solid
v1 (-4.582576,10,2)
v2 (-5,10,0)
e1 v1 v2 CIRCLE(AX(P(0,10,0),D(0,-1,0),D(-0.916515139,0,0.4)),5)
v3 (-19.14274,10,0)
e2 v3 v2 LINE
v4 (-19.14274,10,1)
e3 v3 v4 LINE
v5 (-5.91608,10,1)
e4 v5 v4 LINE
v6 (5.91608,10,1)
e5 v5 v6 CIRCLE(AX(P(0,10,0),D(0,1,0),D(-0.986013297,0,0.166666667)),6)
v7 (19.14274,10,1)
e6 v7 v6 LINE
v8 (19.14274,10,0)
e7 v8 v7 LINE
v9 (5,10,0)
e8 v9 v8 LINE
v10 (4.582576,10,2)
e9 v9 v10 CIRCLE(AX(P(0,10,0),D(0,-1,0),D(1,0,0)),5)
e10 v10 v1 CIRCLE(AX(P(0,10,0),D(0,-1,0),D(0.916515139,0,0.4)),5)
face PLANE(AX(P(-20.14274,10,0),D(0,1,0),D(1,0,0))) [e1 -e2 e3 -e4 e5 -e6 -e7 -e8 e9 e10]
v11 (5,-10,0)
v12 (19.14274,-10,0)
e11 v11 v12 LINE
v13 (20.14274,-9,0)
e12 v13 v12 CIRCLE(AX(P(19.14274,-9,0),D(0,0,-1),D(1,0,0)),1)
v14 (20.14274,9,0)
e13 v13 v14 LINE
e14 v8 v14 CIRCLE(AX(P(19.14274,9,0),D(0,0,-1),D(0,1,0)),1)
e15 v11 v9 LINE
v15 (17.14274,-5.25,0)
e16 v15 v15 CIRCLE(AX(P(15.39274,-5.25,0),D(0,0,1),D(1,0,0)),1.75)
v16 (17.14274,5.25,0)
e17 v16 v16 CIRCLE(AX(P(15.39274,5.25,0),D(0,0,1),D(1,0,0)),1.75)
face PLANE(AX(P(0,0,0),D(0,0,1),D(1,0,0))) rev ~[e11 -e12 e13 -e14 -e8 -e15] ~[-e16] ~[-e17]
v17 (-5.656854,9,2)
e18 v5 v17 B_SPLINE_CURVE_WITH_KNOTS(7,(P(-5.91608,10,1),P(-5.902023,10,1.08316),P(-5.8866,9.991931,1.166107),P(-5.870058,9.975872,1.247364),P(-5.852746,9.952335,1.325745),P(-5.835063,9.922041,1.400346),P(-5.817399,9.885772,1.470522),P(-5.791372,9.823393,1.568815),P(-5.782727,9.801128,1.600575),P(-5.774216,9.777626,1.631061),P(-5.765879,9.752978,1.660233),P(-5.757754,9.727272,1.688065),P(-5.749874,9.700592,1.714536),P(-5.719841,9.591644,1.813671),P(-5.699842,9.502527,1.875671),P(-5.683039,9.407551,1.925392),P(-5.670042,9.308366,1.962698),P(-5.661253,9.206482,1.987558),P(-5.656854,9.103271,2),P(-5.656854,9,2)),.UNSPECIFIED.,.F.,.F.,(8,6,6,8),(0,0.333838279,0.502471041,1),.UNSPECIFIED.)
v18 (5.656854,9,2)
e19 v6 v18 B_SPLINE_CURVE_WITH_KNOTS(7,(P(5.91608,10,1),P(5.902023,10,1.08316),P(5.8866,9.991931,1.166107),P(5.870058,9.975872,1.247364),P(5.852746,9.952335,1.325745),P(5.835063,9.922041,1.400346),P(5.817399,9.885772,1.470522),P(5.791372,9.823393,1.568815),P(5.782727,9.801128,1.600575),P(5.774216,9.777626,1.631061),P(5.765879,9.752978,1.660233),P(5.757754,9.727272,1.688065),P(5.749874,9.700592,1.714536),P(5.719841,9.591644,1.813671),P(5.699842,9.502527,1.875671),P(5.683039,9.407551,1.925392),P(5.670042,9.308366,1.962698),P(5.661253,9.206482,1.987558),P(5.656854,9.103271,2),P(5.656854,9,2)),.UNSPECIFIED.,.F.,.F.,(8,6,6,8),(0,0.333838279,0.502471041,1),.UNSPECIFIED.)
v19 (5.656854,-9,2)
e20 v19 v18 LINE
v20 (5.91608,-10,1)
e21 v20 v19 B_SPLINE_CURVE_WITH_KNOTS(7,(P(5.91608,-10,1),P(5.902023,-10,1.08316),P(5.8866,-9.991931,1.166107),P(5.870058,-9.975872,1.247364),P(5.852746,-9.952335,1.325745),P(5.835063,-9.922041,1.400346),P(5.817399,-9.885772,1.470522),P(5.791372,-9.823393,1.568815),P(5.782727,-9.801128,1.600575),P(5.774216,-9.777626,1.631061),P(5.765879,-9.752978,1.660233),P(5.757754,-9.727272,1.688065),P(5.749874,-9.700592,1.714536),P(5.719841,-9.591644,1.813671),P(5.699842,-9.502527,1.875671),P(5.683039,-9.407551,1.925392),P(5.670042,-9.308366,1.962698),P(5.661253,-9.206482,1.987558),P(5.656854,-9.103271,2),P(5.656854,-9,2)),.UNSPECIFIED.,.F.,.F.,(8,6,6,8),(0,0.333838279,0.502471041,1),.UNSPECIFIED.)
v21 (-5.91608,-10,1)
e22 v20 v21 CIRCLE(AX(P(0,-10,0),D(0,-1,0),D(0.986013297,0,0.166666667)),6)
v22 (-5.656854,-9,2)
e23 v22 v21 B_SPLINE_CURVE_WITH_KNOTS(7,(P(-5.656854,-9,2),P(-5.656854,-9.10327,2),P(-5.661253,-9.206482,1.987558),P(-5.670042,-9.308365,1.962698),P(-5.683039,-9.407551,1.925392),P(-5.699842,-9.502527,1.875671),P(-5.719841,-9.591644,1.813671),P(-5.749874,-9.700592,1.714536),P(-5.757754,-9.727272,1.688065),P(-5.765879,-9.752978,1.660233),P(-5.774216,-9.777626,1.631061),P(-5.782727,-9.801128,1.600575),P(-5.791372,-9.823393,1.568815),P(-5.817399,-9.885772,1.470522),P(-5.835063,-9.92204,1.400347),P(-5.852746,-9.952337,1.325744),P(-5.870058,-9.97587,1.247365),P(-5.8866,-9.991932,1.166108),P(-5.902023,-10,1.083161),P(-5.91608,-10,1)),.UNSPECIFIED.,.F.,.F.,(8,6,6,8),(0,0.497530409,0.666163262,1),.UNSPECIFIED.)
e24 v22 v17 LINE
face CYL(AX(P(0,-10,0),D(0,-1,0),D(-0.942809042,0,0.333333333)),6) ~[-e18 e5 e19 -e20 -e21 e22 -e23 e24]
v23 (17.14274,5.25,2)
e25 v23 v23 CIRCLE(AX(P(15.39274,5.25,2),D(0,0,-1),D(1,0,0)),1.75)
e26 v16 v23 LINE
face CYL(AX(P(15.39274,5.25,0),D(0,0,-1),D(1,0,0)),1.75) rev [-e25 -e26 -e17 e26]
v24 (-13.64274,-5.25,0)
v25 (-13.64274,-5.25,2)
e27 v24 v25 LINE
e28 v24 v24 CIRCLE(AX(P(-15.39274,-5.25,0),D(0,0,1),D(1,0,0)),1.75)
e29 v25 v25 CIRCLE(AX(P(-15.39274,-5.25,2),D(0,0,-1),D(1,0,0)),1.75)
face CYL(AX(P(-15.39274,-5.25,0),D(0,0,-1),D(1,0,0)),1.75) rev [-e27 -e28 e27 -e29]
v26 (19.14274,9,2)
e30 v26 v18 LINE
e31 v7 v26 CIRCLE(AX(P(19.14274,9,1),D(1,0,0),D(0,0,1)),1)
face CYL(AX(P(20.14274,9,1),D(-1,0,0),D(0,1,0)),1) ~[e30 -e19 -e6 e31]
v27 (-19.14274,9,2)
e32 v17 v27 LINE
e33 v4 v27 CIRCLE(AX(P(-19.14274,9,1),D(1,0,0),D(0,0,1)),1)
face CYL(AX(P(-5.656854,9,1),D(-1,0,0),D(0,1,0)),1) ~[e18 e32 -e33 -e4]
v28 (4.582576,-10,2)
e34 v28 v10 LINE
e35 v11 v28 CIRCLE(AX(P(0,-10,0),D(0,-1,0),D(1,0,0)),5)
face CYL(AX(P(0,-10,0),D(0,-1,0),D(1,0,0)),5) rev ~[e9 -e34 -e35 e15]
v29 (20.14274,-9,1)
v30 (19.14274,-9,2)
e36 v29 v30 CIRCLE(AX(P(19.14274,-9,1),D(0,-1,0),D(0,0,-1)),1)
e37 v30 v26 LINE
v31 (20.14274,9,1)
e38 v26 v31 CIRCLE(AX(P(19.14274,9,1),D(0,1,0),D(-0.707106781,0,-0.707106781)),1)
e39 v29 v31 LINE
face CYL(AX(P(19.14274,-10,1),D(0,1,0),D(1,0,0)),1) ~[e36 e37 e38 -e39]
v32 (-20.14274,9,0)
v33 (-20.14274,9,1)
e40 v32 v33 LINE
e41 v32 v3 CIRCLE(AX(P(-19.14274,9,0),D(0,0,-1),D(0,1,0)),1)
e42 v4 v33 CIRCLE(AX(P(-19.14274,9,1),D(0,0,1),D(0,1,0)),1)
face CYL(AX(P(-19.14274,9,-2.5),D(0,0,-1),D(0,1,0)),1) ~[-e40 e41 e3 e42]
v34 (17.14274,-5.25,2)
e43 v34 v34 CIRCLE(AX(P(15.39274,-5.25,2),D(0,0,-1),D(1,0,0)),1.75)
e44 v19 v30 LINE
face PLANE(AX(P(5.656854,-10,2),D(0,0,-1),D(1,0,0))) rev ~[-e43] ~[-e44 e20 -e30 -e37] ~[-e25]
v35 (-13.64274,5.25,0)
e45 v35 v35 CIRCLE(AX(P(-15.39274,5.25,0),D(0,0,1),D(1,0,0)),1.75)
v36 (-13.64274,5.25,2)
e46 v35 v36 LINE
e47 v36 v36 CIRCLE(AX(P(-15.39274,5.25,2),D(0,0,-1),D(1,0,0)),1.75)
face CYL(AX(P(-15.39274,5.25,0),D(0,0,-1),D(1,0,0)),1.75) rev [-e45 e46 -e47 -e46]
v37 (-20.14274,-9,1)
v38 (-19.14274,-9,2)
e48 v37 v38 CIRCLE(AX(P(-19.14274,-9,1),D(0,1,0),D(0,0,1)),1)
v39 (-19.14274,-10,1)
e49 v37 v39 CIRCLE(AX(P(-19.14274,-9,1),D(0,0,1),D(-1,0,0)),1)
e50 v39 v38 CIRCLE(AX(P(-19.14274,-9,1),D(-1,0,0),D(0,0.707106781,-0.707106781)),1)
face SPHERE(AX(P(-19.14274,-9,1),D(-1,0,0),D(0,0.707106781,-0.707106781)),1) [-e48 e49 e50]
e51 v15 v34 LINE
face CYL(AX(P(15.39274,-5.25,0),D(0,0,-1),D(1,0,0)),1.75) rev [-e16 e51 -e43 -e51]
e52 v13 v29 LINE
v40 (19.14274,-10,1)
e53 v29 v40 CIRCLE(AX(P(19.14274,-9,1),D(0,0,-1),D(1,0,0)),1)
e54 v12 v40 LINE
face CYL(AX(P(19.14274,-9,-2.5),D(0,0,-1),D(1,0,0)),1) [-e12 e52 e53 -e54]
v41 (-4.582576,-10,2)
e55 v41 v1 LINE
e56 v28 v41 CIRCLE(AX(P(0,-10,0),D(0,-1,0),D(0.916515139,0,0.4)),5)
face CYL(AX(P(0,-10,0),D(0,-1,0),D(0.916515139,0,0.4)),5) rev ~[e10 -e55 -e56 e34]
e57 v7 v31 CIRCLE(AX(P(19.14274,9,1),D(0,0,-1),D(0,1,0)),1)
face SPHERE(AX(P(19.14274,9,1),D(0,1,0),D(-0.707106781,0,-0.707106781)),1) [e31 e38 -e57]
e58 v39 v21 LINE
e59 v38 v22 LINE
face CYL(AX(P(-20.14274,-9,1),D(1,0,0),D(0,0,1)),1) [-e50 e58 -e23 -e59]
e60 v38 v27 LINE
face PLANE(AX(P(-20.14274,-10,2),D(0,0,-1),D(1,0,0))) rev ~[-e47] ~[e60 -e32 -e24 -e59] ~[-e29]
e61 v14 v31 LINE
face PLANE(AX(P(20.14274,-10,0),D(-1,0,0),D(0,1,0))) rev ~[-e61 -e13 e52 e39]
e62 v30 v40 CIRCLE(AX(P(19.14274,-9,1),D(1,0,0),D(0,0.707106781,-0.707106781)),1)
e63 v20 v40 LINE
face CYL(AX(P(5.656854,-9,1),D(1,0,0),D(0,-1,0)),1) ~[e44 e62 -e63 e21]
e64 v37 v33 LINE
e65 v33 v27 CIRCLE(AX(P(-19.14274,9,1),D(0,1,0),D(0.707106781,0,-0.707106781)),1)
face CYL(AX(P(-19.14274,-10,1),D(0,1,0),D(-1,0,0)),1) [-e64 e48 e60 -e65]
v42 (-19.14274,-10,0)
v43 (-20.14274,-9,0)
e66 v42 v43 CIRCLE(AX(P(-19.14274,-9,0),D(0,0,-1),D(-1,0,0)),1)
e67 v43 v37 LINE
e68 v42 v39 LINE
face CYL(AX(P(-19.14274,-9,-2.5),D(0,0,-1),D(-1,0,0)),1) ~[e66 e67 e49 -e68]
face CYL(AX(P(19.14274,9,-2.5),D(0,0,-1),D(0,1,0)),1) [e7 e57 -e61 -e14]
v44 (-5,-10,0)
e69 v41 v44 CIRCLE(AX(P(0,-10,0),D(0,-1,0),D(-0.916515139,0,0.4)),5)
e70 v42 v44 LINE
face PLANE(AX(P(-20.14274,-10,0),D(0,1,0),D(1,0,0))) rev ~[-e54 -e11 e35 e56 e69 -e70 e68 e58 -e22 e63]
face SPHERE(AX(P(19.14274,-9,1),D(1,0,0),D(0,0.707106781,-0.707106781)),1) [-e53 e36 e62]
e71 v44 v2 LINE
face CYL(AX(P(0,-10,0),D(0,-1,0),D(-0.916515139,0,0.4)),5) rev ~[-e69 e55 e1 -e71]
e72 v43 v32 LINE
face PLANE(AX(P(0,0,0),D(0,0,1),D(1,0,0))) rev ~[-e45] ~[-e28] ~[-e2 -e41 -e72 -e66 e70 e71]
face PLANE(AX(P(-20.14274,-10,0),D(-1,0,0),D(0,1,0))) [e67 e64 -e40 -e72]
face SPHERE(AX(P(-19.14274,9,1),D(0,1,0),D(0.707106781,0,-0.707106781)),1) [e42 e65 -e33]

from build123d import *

# Parameters (mm, degrees)
F0_W         = 40.28548
F0_H         = 20
F0_R         = 1.75
F1_DEPTH     = 10
F3_DEPTH     = 25
F4_R         = 1
F5_T1_DEPTH  = 3.5
F5_S5_W      = 1
F5_S5_H      = 1
F5_T6_DEPTH  = 1
F5_S11_W     = 1
F5_S11_H     = 1
F5_T12_DEPTH = 1
F5_S17_W     = 1
F5_S17_H     = 1
F5_T18_DEPTH = 1
F5_S23_W     = 1
F5_S23_H     = 1
F5_T24_DEPTH = 1


# Not quite as in the source:
# - a fillet or chamfer that OpenCascade refuses, or shapes differently, is made with other operations: its cross-section is extruded or revolved along the edge and cut away or added


with BuildPart() as f1:
    # F0 (on Top) → F1 (new body)
    with BuildSketch(Plane.XY):
        Rectangle(F0_W, F0_H)
        with Locations((-15.39274, -5.25)):
            Circle(F0_R, mode=Mode.SUBTRACT)
        with Locations((15.39274, -5.25)):
            Circle(F0_R, mode=Mode.SUBTRACT)
        with Locations((-15.39274, 5.25)):
            Circle(F0_R, mode=Mode.SUBTRACT)
        with Locations((15.39274, 5.25)):
            Circle(F0_R, mode=Mode.SUBTRACT)
    extrude(amount=F1_DEPTH)

    # F2 (on face) → F3 (cut)
    with BuildSketch(Plane.XZ.offset(10)):
        with BuildLine():
            Line((-4.582575695, 2), (4.582575695, 2))
            ThreePointArc((4.582575695, 2), (0, 5), (-4.582575695, 2))
        make_face()
        with BuildLine():
            Line((-5, 0), (5, 0))
            ThreePointArc((5, 0), (4.8945315647, 1.0215482184), (4.582575695, 2))
            Line((4.582575695, 2), (-4.582575695, 2))
            ThreePointArc((-4.582575695, 2), (-4.8945315647, 1.0215482184), (-5, 0))
        make_face()
        with BuildLine():
            ThreePointArc((-5.6568542495, 2), (0, 6), (5.6568542495, 2))
            Line((5.6568542495, 2), (20.14274, 2))
            Line((20.14274, 2), (20.14274, 10))
            Line((20.14274, 10), (-20.14274, 10))
            Line((-20.14274, 10), (-20.14274, 2))
            Line((-20.14274, 2), (-5.6568542495, 2))
        make_face()
    extrude(amount=-F3_DEPTH, mode=Mode.SUBTRACT)

    # F4
    f4_edges = [f1.edges().sort_by_distance(p)[0] for p in [
        (-20.14274, 0, 2),
        (-12.899797, -10, 2),
        (-12.899797, 10, 2),
        (12.899797, 10, 2),
        (20.14274, 0, 2),
        (12.899797, -10, 2),
    ]]
    fillet(f4_edges, radius=F4_R)

    # F5: fillet of radius 1 on 4 edges, made by hand

    # F5_s2 → F5_t1 (cut)
    with BuildSketch(Plane.XY.offset(-2.5)):
        with BuildLine():
            ThreePointArc((20.14274, -9), (19.8498467812, -9.7071067812), (19.14274, -10))
            Line((19.14274, -10), (20.14274, -10))
            Line((20.14274, -10), (20.14274, -9))
        make_face()
        with BuildLine():
            ThreePointArc((19.14274, 10), (19.8498467812, 9.7071067812), (20.14274, 9))
            Line((20.14274, 9), (20.14274, 10))
            Line((20.14274, 10), (19.14274, 10))
        make_face()
        with BuildLine():
            ThreePointArc((-19.14274, 10), (-19.8498467812, 9.7071067812), (-20.14274, 9))
            Line((-20.14274, 9), (-20.14274, 10))
            Line((-20.14274, 10), (-19.14274, 10))
        make_face()
        with BuildLine():
            ThreePointArc((-20.14274, -9), (-19.8498467812, -9.7071067812), (-19.14274, -10))
            Line((-19.14274, -10), (-20.14274, -10))
            Line((-20.14274, -10), (-20.14274, -9))
        make_face()
    extrude(amount=F5_T1_DEPTH, mode=Mode.SUBTRACT)


with BuildPart() as f5_tool4:
    # F5_s5 → F5_t6 (new body)
    with BuildSketch(Plane.YZ.offset(-19.14274)):
        with Locations((-9.5, 1.5)):
            Rectangle(F5_S5_W, F5_S5_H)
    extrude(amount=-F5_T6_DEPTH)

    # F5_s7 → F5_t8 (revolve, cut)
    with BuildSketch(Plane(origin=(-19.14274, -9, 1), x_dir=(0, 0.7071067812, -0.7071067812), z_dir=(0, 0.7071067812, 0.7071067812))):
        with BuildLine():
            ThreePointArc((0, -1), (1, 0), (0, 1))
            Line((0, 1), (0, -1))
        make_face()
    revolve(axis=Axis((-19.14274, -9, 1), (-1, 0, 0)), mode=Mode.SUBTRACT)


with BuildPart() as f1_1:
    add(f1.part)

    # F5_t3: cut F5_tool4
    add(f5_tool4.part, mode=Mode.SUBTRACT)


with BuildPart() as f5_tool10:
    # F5_s11 → F5_t12 (new body)
    with BuildSketch(Plane.XZ.offset(-9)):
        with Locations((-19.64274, 1.5)):
            Rectangle(F5_S11_W, F5_S11_H)
    extrude(amount=-F5_T12_DEPTH)

    # F5_s13 → F5_t14 (revolve, cut)
    with BuildSketch(Plane(origin=(-19.14274, 9, 1), x_dir=(0.7071067812, 0, -0.7071067812), z_dir=(0.7071067812, 0, 0.7071067812))):
        with BuildLine():
            ThreePointArc((0, -1), (1, 0), (0, 1))
            Line((0, 1), (0, -1))
        make_face()
    revolve(axis=Axis((-19.14274, 9, 1), (0, 1, 0)), mode=Mode.SUBTRACT)


with BuildPart() as f1_2:
    add(f1_1.part)

    # F5_t9: cut F5_tool10
    add(f5_tool10.part, mode=Mode.SUBTRACT)


with BuildPart() as f5_tool16:
    # F5_s17 → F5_t18 (new body)
    with BuildSketch(Plane.XZ.offset(-9)):
        with Locations((19.64274, 1.5)):
            Rectangle(F5_S17_W, F5_S17_H)
    extrude(amount=-F5_T18_DEPTH)

    # F5_s19 → F5_t20 (revolve, cut)
    with BuildSketch(Plane(origin=(19.14274, 9, 1), x_dir=(-0.7071067812, 0, -0.7071067812), z_dir=(0.7071067812, 0, -0.7071067812))):
        with BuildLine():
            ThreePointArc((0, -1), (1, 0), (0, 1))
            Line((0, 1), (0, -1))
        make_face()
    revolve(axis=Axis((19.14274, 9, 1), (0, 1, 0)), mode=Mode.SUBTRACT)


with BuildPart() as f1_3:
    add(f1_2.part)

    # F5_t15: cut F5_tool16
    add(f5_tool16.part, mode=Mode.SUBTRACT)


with BuildPart() as f5_tool22:
    # F5_s23 → F5_t24 (new body)
    with BuildSketch(Plane.YZ.offset(19.14274)):
        with Locations((-9.5, 1.5)):
            Rectangle(F5_S23_W, F5_S23_H)
    extrude(amount=F5_T24_DEPTH)

    # F5_s25 → F5_t26 (revolve, cut)
    with BuildSketch(Plane(origin=(19.14274, -9, 1), x_dir=(0, 0.7071067812, -0.7071067812), z_dir=(0, -0.7071067812, -0.7071067812))):
        with BuildLine():
            ThreePointArc((0, -1), (1, 0), (0, 1))
            Line((0, 1), (0, -1))
        make_face()
    revolve(axis=Axis((19.14274, -9, 1), (1, 0, 0)), mode=Mode.SUBTRACT)


with BuildPart() as f1_4:
    add(f1_3.part)

    # F5_t21: cut F5_tool22
    add(f5_tool22.part, mode=Mode.SUBTRACT)


solid = f1_4.part
